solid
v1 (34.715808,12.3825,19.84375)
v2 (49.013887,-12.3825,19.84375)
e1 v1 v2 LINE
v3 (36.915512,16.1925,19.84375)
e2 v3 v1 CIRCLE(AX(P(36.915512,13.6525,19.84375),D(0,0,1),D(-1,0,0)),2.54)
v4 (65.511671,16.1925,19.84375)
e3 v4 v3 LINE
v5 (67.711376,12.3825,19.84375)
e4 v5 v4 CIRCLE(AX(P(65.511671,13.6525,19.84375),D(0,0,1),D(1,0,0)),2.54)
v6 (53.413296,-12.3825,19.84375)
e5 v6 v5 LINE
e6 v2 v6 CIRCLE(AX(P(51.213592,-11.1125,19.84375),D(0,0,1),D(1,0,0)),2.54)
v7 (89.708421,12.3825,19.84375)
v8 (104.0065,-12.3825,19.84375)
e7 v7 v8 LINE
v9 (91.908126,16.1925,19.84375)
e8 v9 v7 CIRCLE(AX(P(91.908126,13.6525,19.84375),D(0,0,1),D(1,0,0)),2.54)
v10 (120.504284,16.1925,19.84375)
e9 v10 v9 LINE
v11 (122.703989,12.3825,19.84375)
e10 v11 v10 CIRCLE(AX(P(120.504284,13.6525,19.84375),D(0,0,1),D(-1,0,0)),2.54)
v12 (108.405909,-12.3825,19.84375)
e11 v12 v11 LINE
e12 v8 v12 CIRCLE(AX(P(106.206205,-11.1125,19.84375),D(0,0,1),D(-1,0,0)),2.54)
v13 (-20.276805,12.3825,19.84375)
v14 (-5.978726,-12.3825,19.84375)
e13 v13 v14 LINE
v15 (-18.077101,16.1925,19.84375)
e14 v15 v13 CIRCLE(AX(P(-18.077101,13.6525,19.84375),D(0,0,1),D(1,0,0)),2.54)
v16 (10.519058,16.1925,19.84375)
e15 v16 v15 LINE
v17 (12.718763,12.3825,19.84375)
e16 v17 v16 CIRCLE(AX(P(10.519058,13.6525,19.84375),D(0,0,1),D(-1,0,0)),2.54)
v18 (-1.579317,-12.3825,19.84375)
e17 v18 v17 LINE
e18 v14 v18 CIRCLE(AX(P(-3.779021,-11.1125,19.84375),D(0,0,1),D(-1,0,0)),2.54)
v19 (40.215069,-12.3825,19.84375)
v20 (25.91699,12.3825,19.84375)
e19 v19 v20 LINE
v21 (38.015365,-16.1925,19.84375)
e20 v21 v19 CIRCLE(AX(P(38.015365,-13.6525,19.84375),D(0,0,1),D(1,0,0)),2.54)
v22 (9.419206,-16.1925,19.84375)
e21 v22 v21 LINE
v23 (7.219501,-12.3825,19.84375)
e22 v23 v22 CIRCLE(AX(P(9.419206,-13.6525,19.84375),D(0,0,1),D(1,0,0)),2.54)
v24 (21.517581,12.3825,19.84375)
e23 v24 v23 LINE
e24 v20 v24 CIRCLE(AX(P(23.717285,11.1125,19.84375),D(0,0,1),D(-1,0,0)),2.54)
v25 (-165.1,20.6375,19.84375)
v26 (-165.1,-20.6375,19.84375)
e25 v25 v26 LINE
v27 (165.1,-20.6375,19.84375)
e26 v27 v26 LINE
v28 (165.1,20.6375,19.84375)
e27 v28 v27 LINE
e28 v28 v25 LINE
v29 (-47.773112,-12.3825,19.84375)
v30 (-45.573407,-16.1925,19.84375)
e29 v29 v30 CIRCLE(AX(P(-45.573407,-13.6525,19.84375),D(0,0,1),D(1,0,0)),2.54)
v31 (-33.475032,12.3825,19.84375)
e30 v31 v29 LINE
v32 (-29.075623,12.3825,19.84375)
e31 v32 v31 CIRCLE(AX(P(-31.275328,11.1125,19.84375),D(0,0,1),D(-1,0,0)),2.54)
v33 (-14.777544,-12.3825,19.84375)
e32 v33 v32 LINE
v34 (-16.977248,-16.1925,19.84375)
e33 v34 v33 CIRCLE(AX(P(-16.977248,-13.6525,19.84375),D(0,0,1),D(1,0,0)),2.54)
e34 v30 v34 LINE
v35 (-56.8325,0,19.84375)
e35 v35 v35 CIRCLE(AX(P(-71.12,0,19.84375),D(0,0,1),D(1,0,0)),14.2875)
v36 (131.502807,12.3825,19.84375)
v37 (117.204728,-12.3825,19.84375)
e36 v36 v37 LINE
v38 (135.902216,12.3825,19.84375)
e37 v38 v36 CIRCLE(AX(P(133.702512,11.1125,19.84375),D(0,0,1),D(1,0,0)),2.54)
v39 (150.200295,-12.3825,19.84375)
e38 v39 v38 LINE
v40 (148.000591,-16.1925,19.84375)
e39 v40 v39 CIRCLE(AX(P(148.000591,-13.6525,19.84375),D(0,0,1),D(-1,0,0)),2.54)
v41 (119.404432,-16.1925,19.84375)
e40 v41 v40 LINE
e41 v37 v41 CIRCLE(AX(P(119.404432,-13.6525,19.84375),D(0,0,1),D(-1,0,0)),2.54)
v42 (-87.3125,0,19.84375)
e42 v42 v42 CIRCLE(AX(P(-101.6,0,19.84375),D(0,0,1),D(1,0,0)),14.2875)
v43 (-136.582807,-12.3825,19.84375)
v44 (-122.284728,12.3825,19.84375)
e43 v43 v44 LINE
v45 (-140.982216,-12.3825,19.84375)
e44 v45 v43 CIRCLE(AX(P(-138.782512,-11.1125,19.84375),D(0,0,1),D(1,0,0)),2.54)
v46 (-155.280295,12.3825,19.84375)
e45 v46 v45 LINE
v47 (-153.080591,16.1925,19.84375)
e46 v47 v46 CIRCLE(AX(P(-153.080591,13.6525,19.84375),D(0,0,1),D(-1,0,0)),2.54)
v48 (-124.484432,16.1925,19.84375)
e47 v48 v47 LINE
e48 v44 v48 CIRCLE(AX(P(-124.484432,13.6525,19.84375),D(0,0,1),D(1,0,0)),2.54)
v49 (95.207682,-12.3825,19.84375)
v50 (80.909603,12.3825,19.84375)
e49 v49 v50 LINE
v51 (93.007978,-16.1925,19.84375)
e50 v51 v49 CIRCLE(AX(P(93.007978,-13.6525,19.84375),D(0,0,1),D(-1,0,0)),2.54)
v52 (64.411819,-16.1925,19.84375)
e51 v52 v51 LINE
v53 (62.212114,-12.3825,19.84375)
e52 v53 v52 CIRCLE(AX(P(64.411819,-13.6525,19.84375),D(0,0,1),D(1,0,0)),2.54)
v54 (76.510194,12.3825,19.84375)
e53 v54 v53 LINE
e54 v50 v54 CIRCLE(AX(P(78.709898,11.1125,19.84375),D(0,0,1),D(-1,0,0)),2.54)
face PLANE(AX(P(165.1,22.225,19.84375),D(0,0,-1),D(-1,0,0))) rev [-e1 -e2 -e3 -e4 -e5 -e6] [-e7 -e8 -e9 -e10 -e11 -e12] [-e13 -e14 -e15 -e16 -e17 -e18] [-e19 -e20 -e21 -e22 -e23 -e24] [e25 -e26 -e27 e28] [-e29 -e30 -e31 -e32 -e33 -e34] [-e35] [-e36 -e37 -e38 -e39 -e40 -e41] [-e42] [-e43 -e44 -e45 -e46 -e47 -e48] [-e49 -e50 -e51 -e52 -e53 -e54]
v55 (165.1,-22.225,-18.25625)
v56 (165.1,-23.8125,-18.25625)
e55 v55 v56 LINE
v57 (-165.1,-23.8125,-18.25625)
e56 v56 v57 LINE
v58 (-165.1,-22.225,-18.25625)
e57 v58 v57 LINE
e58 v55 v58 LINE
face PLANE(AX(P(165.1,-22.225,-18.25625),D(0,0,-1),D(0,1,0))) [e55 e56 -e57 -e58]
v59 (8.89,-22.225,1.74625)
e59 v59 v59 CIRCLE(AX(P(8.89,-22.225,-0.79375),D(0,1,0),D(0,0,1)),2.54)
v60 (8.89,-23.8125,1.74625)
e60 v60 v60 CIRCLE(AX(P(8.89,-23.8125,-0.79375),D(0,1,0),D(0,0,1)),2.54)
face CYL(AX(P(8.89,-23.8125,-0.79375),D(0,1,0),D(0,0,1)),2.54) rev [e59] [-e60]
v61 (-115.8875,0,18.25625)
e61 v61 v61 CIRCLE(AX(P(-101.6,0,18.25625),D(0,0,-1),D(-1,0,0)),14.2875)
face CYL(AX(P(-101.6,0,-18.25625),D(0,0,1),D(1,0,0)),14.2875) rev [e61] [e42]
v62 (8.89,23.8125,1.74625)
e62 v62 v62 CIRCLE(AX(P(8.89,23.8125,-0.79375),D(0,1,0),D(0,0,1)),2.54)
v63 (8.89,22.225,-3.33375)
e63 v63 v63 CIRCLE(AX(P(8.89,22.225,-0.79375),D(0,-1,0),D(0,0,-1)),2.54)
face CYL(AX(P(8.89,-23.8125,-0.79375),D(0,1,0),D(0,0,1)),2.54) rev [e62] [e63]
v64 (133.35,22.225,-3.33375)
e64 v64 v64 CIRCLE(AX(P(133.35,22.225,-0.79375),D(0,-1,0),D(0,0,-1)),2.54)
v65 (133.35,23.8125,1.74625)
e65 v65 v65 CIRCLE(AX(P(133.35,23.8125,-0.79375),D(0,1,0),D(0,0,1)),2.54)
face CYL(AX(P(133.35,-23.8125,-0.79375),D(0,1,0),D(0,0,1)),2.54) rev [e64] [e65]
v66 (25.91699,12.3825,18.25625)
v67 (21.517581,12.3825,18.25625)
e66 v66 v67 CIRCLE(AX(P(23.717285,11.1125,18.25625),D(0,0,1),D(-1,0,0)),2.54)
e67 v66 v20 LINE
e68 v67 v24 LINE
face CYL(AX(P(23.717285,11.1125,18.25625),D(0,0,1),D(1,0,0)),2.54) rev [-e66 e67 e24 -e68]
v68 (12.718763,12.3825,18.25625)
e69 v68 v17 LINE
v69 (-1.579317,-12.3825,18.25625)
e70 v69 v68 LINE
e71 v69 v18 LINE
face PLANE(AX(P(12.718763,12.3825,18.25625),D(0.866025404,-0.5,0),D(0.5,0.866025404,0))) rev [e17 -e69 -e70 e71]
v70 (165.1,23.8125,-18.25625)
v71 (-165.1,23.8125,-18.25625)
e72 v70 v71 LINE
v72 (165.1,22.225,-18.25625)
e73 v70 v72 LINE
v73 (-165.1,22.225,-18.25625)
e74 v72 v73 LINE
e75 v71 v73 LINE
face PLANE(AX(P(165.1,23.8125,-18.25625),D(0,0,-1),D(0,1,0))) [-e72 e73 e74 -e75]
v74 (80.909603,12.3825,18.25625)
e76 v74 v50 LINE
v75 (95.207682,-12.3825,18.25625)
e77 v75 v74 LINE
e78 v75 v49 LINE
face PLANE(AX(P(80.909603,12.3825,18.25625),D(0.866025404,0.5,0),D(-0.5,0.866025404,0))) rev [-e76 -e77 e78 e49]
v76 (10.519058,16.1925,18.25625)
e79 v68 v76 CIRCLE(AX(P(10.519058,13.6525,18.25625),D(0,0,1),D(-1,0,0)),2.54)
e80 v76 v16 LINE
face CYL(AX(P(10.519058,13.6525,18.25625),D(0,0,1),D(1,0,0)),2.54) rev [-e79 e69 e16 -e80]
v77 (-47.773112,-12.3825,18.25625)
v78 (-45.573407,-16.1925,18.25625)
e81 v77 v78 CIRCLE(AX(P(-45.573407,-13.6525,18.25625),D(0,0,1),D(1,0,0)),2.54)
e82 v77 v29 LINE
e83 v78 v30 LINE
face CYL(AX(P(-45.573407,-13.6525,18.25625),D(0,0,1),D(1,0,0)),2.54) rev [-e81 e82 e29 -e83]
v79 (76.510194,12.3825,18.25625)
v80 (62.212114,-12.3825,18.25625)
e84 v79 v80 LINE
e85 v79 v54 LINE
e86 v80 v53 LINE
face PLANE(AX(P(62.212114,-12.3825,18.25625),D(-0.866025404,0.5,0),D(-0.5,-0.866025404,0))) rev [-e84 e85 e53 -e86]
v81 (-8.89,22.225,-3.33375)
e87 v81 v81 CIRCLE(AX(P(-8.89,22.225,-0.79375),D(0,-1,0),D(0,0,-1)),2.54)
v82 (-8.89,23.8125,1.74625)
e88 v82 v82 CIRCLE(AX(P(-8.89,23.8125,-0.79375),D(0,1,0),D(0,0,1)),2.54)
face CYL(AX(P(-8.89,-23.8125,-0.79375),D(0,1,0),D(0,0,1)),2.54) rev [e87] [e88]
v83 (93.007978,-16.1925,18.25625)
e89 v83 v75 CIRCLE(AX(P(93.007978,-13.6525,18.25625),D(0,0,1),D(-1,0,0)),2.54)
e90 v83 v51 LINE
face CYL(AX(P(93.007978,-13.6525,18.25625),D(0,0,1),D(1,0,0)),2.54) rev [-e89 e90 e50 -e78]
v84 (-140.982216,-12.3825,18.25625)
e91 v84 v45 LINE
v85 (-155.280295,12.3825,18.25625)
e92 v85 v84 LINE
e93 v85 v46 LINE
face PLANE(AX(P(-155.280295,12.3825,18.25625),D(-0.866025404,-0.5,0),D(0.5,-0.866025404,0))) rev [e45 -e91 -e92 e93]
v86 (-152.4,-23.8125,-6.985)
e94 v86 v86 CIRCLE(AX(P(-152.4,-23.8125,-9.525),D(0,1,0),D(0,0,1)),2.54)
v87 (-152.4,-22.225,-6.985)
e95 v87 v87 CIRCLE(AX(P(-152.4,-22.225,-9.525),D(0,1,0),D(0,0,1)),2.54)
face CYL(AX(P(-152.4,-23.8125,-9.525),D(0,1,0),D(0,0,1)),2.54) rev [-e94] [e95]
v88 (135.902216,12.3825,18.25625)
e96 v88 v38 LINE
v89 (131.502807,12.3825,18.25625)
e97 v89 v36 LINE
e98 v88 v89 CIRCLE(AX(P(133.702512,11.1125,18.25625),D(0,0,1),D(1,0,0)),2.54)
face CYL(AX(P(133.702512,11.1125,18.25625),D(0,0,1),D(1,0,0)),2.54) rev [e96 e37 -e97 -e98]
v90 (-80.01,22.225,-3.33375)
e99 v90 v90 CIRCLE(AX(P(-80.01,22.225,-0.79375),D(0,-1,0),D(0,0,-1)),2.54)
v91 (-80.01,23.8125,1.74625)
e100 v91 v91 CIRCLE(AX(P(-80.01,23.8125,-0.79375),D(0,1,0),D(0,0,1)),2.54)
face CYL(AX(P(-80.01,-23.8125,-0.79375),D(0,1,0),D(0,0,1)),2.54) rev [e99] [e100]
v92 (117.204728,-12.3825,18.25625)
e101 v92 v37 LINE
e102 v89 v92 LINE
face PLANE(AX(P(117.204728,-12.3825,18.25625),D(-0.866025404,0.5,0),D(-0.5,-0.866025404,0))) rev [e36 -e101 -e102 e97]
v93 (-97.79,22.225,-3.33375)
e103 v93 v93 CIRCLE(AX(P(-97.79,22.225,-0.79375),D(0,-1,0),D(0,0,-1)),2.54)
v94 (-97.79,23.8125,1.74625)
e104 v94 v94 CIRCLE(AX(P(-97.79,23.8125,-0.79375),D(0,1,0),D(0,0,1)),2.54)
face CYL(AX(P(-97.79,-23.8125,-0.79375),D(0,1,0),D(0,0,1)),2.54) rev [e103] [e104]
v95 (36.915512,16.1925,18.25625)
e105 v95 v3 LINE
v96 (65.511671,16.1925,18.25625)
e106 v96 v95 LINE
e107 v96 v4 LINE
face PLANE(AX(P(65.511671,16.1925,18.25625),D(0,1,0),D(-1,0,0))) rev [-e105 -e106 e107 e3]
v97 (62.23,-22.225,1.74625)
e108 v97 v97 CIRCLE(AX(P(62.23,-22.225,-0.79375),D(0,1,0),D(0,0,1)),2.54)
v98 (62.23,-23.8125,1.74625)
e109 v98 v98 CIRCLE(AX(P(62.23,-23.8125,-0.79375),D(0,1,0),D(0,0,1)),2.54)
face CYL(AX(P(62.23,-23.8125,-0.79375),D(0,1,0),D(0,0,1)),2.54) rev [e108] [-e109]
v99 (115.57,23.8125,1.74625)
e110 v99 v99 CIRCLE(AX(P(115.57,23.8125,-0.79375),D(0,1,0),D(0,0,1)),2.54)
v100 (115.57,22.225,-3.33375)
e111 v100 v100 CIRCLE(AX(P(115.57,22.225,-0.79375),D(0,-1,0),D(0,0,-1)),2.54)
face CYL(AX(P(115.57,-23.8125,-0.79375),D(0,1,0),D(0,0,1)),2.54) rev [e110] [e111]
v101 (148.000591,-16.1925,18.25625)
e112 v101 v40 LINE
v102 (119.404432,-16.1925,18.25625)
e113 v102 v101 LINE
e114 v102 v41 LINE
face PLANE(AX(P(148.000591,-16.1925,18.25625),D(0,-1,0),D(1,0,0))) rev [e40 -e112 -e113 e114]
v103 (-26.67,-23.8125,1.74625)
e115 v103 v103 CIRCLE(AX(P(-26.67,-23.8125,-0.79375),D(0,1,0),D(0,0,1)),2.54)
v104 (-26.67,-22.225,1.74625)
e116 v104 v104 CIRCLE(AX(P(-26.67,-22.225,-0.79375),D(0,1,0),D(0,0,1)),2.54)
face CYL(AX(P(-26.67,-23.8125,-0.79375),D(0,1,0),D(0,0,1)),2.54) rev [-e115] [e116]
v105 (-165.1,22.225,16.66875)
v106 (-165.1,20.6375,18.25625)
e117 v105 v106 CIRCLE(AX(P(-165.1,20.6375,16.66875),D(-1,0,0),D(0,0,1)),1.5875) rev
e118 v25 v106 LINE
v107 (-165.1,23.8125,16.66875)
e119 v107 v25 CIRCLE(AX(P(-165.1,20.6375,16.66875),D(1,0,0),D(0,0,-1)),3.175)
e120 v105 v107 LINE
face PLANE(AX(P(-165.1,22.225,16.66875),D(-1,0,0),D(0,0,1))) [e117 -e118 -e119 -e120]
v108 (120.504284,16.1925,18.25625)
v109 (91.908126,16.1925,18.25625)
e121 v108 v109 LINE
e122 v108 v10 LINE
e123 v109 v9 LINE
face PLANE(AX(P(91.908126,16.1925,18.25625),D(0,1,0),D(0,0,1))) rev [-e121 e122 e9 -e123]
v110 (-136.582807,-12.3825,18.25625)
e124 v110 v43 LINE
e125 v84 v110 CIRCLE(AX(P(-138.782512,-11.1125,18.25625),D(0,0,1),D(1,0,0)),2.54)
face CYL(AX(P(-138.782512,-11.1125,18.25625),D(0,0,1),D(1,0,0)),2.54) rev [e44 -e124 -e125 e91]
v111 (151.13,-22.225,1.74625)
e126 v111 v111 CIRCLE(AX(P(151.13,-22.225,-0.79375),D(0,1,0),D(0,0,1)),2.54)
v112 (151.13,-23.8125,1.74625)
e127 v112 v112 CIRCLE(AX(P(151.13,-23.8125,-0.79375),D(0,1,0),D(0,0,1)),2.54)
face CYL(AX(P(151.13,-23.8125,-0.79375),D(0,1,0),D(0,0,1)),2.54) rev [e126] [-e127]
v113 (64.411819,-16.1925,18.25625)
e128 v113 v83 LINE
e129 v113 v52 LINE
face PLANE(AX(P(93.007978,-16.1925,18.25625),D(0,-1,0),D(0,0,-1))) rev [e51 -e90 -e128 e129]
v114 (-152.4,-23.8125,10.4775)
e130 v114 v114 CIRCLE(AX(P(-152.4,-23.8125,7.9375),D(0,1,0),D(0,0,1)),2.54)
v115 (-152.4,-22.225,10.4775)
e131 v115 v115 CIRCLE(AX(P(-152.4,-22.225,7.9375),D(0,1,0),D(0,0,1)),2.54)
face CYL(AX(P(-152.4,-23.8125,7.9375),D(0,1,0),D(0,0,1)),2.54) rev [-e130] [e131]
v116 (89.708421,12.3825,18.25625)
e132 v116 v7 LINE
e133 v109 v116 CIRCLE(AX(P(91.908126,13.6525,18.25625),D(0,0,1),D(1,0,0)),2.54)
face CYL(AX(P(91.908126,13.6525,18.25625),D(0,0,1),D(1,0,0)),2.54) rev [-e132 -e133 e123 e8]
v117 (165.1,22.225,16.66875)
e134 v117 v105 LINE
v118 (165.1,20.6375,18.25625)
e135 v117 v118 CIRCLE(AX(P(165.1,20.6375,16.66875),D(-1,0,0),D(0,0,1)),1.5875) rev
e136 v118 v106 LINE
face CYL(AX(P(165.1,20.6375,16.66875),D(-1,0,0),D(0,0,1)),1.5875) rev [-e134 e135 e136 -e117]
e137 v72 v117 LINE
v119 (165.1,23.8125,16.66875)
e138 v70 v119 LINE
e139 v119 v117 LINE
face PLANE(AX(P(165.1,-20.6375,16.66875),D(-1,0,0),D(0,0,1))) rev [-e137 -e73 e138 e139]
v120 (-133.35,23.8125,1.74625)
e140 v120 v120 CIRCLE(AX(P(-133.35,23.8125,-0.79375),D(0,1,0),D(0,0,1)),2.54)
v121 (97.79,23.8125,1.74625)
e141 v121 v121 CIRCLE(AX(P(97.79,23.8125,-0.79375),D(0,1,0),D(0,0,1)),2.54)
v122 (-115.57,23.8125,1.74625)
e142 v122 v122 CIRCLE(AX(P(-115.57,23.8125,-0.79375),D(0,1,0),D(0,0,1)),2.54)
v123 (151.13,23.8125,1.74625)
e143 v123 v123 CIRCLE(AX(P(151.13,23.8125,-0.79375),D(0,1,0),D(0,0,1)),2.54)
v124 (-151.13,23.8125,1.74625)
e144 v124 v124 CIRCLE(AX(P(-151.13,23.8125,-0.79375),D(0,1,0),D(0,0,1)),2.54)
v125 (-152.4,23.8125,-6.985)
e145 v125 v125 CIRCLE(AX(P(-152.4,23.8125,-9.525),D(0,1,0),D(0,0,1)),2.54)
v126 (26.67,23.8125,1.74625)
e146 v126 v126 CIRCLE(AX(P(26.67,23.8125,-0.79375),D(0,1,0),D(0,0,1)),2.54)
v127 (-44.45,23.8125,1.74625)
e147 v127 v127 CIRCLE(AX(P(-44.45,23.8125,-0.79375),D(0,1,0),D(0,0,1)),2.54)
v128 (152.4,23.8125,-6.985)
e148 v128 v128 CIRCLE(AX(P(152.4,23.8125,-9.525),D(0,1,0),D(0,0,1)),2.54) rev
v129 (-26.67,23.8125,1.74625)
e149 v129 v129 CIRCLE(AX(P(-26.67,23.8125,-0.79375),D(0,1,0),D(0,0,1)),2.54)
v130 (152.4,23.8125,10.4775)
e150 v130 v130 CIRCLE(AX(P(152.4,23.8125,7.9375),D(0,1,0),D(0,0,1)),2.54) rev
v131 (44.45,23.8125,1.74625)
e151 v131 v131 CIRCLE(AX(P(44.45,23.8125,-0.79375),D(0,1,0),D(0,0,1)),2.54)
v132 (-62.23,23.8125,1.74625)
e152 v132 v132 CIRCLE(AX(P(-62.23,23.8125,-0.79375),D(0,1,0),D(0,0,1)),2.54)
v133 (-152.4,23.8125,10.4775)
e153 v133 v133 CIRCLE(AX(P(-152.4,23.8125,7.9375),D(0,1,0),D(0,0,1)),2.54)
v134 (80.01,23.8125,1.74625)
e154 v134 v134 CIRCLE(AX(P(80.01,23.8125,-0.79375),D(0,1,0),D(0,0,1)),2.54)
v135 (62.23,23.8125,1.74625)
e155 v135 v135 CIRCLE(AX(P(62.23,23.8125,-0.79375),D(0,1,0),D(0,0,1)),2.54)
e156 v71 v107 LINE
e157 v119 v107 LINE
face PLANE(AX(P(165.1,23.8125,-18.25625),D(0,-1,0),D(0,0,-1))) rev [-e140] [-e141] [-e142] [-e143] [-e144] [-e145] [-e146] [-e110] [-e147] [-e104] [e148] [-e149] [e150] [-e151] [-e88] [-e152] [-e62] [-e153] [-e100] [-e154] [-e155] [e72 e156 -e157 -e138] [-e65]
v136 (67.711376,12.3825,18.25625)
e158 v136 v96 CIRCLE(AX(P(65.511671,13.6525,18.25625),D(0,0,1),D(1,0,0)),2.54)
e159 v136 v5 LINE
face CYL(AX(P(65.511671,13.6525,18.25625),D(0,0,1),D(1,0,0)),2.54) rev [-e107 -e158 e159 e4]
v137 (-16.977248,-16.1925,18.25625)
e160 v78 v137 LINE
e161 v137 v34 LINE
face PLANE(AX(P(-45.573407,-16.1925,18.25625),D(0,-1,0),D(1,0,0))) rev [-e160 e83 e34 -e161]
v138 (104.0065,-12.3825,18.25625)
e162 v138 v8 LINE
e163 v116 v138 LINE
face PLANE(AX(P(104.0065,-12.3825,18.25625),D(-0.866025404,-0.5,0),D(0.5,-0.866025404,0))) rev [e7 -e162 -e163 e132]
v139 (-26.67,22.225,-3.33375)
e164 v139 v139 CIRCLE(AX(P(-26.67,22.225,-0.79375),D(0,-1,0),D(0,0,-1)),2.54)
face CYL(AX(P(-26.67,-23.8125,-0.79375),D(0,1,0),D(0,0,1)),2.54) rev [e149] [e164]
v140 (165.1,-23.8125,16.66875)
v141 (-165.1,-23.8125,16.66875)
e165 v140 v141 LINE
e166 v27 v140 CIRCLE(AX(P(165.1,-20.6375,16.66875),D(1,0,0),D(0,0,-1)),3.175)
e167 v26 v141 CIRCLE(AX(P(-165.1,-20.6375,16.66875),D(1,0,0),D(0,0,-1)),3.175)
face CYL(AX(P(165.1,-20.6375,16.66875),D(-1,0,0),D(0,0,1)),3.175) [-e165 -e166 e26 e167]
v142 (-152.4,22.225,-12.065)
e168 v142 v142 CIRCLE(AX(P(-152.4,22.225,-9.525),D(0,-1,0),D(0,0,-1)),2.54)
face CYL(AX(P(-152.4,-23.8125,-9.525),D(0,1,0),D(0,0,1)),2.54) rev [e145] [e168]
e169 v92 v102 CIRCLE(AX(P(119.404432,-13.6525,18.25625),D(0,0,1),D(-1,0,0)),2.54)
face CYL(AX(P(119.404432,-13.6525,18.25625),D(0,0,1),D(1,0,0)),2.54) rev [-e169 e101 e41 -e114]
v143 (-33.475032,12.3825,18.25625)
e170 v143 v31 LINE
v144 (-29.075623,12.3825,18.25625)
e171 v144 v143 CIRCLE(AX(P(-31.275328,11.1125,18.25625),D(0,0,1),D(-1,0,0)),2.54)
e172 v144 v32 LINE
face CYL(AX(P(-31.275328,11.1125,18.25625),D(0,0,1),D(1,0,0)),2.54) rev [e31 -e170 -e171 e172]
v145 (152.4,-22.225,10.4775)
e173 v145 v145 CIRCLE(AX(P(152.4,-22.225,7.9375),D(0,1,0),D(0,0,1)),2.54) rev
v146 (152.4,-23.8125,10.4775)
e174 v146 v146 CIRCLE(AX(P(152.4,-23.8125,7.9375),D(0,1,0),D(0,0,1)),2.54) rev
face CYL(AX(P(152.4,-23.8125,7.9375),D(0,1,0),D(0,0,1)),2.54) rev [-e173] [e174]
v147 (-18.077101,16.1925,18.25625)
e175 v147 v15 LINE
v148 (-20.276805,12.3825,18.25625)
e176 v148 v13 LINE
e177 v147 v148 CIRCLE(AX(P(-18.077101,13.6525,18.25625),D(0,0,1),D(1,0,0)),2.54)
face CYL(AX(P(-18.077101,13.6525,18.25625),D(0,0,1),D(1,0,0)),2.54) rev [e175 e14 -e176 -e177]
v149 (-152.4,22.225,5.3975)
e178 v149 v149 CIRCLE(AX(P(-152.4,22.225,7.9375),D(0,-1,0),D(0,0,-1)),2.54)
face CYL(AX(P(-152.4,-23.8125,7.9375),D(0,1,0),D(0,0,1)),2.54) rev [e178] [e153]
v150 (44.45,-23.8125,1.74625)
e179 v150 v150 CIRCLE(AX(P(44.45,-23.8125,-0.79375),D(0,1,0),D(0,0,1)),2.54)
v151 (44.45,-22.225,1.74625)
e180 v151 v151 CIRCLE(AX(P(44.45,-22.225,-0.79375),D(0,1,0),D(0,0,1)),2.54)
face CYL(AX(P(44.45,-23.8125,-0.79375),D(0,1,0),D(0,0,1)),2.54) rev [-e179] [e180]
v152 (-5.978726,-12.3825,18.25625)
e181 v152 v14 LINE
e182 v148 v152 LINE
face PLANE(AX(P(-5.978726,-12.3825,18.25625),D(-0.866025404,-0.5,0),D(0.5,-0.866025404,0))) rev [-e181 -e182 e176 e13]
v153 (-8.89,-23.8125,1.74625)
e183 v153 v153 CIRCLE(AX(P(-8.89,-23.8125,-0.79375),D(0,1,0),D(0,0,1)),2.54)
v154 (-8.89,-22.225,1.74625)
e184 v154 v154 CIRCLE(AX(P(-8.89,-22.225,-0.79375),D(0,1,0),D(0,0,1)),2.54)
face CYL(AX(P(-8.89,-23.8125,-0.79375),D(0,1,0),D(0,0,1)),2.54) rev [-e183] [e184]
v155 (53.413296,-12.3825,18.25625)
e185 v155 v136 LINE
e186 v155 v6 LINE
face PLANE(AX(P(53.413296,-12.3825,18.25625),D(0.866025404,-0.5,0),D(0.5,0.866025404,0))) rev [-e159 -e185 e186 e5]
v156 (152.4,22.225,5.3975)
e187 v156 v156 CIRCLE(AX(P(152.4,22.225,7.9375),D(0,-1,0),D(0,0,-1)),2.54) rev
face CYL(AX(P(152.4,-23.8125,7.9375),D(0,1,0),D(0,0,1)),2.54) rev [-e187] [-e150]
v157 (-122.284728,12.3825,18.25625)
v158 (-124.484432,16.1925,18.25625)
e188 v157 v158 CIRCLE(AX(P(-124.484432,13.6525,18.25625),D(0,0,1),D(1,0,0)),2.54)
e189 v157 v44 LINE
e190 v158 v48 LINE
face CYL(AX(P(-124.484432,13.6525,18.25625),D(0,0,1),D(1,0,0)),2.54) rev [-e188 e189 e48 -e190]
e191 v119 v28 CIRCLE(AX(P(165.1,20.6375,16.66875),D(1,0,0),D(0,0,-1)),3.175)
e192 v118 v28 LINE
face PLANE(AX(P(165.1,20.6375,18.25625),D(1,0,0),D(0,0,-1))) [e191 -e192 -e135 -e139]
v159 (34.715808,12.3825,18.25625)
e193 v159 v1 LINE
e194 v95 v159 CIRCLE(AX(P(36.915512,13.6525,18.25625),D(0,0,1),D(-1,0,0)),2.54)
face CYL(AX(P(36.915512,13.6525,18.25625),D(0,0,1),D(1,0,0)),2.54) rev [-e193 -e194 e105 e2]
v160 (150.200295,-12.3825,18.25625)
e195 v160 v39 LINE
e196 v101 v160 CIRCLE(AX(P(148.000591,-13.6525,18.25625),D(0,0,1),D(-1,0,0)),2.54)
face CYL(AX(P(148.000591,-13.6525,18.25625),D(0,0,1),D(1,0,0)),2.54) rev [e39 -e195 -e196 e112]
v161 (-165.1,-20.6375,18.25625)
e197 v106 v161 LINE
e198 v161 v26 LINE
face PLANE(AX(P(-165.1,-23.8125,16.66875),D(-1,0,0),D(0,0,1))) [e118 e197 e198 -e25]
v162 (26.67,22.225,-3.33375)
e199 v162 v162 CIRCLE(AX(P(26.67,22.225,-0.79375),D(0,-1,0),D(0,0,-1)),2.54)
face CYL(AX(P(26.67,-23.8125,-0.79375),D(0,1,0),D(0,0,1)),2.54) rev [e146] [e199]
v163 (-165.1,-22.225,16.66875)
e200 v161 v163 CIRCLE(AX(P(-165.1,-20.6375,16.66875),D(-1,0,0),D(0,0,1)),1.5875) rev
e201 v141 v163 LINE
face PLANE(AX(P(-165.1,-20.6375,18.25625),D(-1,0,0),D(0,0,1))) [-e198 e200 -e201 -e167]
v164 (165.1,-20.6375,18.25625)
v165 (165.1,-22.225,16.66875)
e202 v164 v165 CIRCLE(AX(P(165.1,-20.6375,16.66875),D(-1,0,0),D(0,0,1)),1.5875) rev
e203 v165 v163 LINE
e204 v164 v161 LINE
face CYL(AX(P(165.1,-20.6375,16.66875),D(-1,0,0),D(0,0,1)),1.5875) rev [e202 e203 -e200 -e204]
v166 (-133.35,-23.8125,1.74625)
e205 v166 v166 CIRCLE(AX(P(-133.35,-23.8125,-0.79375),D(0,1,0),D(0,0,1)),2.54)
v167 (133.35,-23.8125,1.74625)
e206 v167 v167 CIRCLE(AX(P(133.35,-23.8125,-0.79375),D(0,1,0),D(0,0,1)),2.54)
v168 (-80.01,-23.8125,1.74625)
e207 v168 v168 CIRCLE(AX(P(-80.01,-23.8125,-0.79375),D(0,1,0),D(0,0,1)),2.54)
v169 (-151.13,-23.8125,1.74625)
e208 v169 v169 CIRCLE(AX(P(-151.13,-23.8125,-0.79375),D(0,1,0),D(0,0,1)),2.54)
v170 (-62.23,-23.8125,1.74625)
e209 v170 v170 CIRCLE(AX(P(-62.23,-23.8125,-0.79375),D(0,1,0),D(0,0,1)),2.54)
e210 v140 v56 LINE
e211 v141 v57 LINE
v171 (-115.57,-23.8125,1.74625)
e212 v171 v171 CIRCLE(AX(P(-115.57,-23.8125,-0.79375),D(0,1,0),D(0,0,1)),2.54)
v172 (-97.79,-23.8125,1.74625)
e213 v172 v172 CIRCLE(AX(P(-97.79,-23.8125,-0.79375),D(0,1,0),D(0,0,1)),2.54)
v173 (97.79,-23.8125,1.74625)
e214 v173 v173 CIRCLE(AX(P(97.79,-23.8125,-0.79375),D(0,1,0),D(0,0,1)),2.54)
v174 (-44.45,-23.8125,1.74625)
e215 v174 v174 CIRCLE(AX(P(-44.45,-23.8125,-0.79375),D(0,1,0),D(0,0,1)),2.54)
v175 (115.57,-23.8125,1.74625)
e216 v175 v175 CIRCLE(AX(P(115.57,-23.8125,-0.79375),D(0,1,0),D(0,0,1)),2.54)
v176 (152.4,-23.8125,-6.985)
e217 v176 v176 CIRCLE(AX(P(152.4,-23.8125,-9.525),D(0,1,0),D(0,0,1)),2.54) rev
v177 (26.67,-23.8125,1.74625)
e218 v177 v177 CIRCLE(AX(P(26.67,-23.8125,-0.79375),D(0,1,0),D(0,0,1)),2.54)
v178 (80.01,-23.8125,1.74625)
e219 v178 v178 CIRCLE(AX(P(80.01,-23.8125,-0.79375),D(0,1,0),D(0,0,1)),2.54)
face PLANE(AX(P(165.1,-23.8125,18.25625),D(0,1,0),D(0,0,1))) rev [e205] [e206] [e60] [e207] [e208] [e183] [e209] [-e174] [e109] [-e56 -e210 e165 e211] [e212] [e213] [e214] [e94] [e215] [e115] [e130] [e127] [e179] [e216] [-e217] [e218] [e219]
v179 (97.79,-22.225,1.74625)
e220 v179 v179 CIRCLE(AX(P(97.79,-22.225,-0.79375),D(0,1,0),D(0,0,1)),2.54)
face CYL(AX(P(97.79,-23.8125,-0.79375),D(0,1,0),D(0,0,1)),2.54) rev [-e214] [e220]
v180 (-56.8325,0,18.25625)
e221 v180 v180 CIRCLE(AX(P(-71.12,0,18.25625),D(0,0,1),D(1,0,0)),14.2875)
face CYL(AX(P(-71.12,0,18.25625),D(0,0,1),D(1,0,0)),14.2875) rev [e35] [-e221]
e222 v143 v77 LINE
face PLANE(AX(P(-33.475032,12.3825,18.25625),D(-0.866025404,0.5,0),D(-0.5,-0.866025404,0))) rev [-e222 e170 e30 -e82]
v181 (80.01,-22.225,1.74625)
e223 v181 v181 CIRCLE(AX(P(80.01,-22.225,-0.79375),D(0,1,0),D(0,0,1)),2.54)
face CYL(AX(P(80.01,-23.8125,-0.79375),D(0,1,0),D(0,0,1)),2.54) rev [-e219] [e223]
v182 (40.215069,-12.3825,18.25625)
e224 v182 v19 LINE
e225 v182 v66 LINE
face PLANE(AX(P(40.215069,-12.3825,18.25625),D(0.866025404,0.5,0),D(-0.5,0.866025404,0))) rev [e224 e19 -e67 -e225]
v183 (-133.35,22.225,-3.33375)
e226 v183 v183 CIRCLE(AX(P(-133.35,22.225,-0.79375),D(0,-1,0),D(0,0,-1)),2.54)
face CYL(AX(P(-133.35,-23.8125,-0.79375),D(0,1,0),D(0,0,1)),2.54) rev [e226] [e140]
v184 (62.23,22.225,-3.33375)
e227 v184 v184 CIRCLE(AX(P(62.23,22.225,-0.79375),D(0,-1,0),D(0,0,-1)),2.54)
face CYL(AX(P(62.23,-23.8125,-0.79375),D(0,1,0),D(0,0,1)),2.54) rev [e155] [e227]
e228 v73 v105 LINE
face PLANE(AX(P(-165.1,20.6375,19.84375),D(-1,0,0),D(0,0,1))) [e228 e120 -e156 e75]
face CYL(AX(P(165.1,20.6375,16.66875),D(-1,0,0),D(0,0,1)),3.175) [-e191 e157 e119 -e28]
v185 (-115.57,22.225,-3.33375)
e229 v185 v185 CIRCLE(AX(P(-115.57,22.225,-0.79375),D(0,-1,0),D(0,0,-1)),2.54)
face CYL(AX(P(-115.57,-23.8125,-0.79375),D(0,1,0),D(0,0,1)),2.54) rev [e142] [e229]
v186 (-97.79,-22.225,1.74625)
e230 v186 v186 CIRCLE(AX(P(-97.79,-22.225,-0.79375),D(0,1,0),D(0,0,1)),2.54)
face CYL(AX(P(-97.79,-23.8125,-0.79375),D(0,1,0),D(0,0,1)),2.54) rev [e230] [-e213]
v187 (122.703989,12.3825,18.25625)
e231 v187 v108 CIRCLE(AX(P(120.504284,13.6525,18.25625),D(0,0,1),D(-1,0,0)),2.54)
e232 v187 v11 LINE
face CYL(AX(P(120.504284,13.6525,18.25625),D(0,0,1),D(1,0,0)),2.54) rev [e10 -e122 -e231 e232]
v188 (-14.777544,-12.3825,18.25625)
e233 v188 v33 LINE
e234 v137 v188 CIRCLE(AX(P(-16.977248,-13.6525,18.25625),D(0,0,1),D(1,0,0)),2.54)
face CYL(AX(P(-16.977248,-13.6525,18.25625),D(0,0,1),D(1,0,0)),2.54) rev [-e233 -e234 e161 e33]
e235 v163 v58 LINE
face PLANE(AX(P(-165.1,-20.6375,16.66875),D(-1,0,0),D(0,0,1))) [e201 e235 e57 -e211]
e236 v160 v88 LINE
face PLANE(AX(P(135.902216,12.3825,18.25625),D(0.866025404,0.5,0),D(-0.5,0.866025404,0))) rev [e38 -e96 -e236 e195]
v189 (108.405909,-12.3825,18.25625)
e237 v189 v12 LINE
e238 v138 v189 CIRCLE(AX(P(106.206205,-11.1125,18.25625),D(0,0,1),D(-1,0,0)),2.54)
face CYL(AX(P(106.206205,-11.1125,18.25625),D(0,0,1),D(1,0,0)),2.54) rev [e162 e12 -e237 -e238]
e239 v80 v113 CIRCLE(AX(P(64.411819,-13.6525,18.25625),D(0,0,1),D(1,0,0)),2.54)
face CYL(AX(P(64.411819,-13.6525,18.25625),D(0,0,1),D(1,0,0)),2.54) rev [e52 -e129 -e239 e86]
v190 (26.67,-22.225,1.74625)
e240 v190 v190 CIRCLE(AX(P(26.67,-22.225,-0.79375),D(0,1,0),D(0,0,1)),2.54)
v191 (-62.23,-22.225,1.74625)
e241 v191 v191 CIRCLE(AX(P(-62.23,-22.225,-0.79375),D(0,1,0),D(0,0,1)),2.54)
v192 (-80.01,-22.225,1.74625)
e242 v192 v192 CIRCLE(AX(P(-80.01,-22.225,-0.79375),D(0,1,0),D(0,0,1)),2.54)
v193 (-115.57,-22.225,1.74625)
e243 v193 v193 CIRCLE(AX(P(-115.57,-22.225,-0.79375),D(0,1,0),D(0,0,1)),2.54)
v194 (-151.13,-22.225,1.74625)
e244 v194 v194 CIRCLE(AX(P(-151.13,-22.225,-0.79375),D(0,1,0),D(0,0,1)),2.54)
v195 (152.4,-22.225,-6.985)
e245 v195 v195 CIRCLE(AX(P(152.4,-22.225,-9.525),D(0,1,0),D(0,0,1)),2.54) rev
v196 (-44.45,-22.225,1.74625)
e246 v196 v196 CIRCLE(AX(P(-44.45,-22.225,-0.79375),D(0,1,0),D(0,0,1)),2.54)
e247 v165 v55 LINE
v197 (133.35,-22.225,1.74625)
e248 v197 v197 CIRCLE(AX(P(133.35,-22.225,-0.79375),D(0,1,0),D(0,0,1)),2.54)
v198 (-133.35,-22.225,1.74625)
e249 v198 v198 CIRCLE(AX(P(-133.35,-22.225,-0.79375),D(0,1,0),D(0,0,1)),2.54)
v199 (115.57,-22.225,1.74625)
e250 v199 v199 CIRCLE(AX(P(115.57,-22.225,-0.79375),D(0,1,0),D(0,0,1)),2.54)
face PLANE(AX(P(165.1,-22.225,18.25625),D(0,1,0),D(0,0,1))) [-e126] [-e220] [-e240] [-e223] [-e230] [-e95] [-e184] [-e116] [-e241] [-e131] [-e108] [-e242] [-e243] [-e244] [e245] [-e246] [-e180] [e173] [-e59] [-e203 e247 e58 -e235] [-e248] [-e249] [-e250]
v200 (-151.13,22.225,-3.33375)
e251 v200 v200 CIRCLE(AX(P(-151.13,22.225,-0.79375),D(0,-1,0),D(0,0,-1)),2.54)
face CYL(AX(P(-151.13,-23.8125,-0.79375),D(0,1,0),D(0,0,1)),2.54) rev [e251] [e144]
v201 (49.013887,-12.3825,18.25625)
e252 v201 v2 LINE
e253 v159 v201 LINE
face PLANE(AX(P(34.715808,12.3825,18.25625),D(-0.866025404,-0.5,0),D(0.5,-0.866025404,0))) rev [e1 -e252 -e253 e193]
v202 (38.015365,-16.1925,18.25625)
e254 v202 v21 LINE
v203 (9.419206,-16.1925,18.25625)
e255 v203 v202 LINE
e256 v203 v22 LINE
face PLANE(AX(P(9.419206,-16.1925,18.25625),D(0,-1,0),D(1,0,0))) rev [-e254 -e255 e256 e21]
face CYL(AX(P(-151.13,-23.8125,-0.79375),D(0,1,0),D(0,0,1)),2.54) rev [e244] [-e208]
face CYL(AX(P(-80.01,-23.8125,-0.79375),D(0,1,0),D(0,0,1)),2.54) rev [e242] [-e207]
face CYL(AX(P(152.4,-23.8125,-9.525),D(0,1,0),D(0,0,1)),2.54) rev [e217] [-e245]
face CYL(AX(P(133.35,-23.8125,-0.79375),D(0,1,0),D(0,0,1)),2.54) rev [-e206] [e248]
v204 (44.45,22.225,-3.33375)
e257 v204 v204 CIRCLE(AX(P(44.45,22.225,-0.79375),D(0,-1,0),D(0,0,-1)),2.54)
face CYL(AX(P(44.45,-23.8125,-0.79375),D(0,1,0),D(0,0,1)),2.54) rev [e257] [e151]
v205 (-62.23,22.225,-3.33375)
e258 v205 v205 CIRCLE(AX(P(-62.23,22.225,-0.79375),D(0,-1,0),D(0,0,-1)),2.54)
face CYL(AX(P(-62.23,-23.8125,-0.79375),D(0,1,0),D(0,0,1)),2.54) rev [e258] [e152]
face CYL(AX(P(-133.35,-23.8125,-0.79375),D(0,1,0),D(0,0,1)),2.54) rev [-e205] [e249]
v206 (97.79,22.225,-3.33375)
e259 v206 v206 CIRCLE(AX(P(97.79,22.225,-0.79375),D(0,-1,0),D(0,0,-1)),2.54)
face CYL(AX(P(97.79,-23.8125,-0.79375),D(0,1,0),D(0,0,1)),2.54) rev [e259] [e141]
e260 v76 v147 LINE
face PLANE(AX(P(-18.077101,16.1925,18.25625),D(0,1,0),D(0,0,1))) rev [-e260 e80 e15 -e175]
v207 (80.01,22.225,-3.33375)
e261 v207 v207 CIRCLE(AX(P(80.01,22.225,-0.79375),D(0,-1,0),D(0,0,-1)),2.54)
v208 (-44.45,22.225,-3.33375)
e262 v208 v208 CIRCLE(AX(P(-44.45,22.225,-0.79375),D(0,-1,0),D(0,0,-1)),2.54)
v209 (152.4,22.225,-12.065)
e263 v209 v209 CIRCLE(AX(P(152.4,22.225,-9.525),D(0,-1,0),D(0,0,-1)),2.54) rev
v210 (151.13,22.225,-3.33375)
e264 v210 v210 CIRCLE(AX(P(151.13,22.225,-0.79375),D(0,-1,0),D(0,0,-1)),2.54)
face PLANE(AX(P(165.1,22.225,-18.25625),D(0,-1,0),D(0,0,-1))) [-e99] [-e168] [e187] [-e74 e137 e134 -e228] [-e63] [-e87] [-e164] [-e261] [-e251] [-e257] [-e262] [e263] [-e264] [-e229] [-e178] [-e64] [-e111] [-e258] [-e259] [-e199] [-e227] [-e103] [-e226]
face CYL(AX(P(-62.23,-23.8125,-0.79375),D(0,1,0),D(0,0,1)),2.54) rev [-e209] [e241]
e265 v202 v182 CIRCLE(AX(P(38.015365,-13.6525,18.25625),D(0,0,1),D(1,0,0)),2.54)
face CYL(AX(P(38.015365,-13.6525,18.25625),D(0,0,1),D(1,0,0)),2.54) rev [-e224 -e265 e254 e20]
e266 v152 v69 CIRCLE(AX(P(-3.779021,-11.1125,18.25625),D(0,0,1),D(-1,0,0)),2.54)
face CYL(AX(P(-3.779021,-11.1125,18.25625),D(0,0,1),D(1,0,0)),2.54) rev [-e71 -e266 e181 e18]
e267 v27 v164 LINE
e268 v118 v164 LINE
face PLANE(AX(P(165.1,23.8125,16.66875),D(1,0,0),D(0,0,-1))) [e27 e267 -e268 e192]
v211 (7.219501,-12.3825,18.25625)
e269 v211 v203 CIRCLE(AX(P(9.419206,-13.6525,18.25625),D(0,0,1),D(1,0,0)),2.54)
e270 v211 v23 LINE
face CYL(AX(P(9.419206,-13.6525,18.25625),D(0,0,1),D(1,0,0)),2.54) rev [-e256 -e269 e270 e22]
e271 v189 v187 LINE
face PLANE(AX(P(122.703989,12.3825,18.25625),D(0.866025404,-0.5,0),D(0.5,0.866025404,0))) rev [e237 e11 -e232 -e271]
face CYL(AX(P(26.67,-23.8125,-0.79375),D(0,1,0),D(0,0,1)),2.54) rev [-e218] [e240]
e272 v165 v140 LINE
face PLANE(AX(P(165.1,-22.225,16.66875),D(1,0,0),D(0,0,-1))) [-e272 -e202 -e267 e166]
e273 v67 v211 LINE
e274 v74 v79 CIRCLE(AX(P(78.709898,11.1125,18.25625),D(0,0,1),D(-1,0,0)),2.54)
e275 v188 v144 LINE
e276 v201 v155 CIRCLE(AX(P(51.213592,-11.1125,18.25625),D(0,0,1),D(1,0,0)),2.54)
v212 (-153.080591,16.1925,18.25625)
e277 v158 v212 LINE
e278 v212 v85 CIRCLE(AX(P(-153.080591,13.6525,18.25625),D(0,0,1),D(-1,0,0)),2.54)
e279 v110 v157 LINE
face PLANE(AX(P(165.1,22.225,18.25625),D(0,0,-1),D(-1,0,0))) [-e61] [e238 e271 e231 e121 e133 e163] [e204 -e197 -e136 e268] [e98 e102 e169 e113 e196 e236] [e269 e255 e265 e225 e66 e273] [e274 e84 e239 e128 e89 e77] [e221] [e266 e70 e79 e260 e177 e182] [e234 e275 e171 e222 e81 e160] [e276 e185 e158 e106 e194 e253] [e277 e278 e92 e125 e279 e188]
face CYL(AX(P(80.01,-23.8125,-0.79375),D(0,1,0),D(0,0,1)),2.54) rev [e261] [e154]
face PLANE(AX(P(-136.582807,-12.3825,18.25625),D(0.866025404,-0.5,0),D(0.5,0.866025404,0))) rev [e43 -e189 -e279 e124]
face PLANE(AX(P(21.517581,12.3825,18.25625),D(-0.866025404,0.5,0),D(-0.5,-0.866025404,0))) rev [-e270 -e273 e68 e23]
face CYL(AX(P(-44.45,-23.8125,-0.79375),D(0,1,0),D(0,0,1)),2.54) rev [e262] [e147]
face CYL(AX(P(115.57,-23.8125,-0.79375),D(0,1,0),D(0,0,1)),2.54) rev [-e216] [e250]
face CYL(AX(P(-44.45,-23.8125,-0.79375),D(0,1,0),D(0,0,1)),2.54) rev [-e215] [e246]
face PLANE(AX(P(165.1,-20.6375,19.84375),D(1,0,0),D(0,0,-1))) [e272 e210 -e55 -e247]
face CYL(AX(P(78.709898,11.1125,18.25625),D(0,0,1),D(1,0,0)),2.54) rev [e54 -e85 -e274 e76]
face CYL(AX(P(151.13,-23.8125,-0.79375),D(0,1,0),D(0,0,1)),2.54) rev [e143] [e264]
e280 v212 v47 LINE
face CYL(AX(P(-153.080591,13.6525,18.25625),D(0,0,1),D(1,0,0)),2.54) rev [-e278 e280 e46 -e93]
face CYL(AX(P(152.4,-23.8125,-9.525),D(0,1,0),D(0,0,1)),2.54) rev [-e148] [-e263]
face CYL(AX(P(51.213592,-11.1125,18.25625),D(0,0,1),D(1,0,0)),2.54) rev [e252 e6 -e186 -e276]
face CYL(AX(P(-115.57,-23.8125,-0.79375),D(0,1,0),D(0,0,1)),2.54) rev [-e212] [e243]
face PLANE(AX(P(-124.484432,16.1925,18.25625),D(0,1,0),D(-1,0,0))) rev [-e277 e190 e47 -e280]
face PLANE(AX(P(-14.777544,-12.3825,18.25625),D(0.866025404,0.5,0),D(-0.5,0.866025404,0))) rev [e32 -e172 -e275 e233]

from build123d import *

# Parameters (mm, degrees)
BASE_FLANGE1_DEPTH = 165.1
SKETCH6_R          = 2.54
CUT_EXTRUDE1_DEPTH = 173.973769801
SKETCH8_R          = 14.2875
CUT_EXTRUDE2_DEPTH = 172.104223081
SKETCH9_R          = 14.2875
CUT_EXTRUDE3_DEPTH = 2.54
CUT_EXTRUDE4_DEPTH = 2.54
SKETCH11_R         = 2.54
CUT_EXTRUDE5_DEPTH = 173.973769801


# Sheet-metal steps are written as plain solids
with BuildPart() as part:
    # Sketch1 → Base-Flange1 (new, symmetric)
    with BuildSketch(Plane(origin=(0, 0, 0), x_dir=(0, 0, -1), z_dir=(1, 0, 0))):
        with BuildLine():
            Line((18.25625, 22.225), (-16.66875, 22.225))
            ThreePointArc((-16.66875, 22.225), (-17.791282015, 21.760032015), (-18.25625, 20.6375))
            Line((-18.25625, 20.6375), (-18.25625, -20.6375))
            ThreePointArc((-18.25625, -20.6375), (-17.791282015, -21.760032015), (-16.66875, -22.225))
            Line((-16.66875, -22.225), (18.25625, -22.225))
            Line((18.25625, -22.225), (18.25625, -23.8125))
            Line((18.25625, -23.8125), (-16.66875, -23.8125))
            ThreePointArc((-16.66875, -23.8125), (-18.91381403, -22.88256403), (-19.84375, -20.6375))
            Line((-19.84375, -20.6375), (-19.84375, 20.6375))
            ThreePointArc((-19.84375, 20.6375), (-18.91381403, 22.88256403), (-16.66875, 23.8125))
            Line((-16.66875, 23.8125), (18.25625, 23.8125))
            Line((18.25625, 23.8125), (18.25625, 22.225))
        make_face()
    extrude(amount=BASE_FLANGE1_DEPTH, both=True)

    # Sketch6 → Cut-Extrude1 (cut, through all)
    with BuildSketch(Plane(origin=(0, 23.8125, 0), x_dir=(1, 0, 0), z_dir=(0, 1, 0))):
        with Locations(Location((151.13, 0.79375, 0), (0, 0, 270))):
            Circle(SKETCH6_R)
        with Locations(Location((133.35, 0.79375, 0), (0, 0, 270))):
            Circle(SKETCH6_R)
        with Locations(Location((115.57, 0.79375, 0), (0, 0, 270))):
            Circle(SKETCH6_R)
        with Locations(Location((97.79, 0.79375, 0), (0, 0, 270))):
            Circle(SKETCH6_R)
        with Locations(Location((80.01, 0.79375, 0), (0, 0, 270))):
            Circle(SKETCH6_R)
        with Locations(Location((62.23, 0.79375, 0), (0, 0, 270))):
            Circle(SKETCH6_R)
        with Locations(Location((44.45, 0.79375, 0), (0, 0, 270))):
            Circle(SKETCH6_R)
        with Locations(Location((26.67, 0.79375, 0), (0, 0, 270))):
            Circle(SKETCH6_R)
        with Locations(Location((8.89, 0.79375, 0), (0, 0, 270))):
            Circle(SKETCH6_R)
        with Locations(Location((-8.89, 0.79375, 0), (0, 0, 270))):
            Circle(SKETCH6_R)
        with Locations(Location((-26.67, 0.79375, 0), (0, 0, 270))):
            Circle(SKETCH6_R)
        with Locations(Location((-44.45, 0.79375, 0), (0, 0, 270))):
            Circle(SKETCH6_R)
        with Locations(Location((-62.23, 0.79375, 0), (0, 0, 270))):
            Circle(SKETCH6_R)
        with Locations(Location((-80.01, 0.79375, 0), (0, 0, 270))):
            Circle(SKETCH6_R)
        with Locations(Location((-97.79, 0.79375, 0), (0, 0, 270))):
            Circle(SKETCH6_R)
        with Locations(Location((-115.57, 0.79375, 0), (0, 0, 270))):
            Circle(SKETCH6_R)
        with Locations(Location((-133.35, 0.79375, 0), (0, 0, 270))):
            Circle(SKETCH6_R)
        with Locations(Location((-151.13, 0.79375, 0), (0, 0, 270))):
            Circle(SKETCH6_R)
    extrude(amount=-CUT_EXTRUDE1_DEPTH, mode=Mode.SUBTRACT)

    # Sketch8 → Cut-Extrude2 (cut, through all)
    with BuildSketch(Plane.XY.offset(19.84375)):
        with Locations((-101.6, 0)):
            Circle(SKETCH8_R)
    extrude(amount=-CUT_EXTRUDE2_DEPTH, mode=Mode.SUBTRACT)

    # Sketch9 → Cut-Extrude3 (cut)
    with BuildSketch(Plane.XY.offset(19.84375)):
        with Locations((-71.12, 0)):
            Circle(SKETCH9_R)
        with BuildLine():
            Line((135.902216058, 12.3825), (150.200295474, -12.3825))
            ThreePointArc((150.200295474, -12.3825), (150.200295474, -14.9225), (148.000590949, -16.1925))
            Line((148.000590949, -16.1925), (119.404432116, -16.1925))
            ThreePointArc((119.404432116, -16.1925), (117.20472759, -14.9225), (117.20472759, -12.3825))
            Line((117.20472759, -12.3825), (131.502807007, 12.3825))
            ThreePointArc((131.502807007, 12.3825), (133.702511532, 13.6525), (135.902216058, 12.3825))
        make_face()
        with BuildLine():
            Line((91.908125546, 16.1925), (120.504284379, 16.1925))
            ThreePointArc((120.504284379, 16.1925), (122.703988904, 14.9225), (122.703988904, 12.3825))
            Line((122.703988904, 12.3825), (108.405909488, -12.3825))
            ThreePointArc((108.405909488, -12.3825), (106.206204962, -13.6525), (104.006500437, -12.3825))
            Line((104.006500437, -12.3825), (89.70842102, 12.3825))
            ThreePointArc((89.70842102, 12.3825), (89.70842102, 14.9225), (91.908125546, 16.1925))
        make_face()
        with BuildLine():
            Line((62.21211445, -12.3825), (76.510193866, 12.3825))
            ThreePointArc((76.510193866, 12.3825), (78.709898392, 13.6525), (80.909602918, 12.3825))
            Line((80.909602918, 12.3825), (95.207682334, -12.3825))
            ThreePointArc((95.207682334, -12.3825), (95.207682334, -14.9225), (93.007977808, -16.1925))
            Line((93.007977808, -16.1925), (64.411818976, -16.1925))
            ThreePointArc((64.411818976, -16.1925), (62.21211445, -14.9225), (62.21211445, -12.3825))
        make_face()
        with BuildLine():
            Line((34.71580788, 12.3825), (49.013887296, -12.3825))
            ThreePointArc((49.013887296, -12.3825), (51.213591822, -13.6525), (53.413296347, -12.3825))
            Line((53.413296347, -12.3825), (67.711375764, 12.3825))
            ThreePointArc((67.711375764, 12.3825), (67.711375764, 14.9225), (65.511671238, 16.1925))
            Line((65.511671238, 16.1925), (36.915512405, 16.1925))
            ThreePointArc((36.915512405, 16.1925), (34.71580788, 14.9225), (34.71580788, 12.3825))
        make_face()
        with BuildLine():
            Line((21.517580726, 12.3825), (7.21950131, -12.3825))
            ThreePointArc((7.21950131, -12.3825), (7.21950131, -14.9225), (9.419205835, -16.1925))
            Line((9.419205835, -16.1925), (38.015364668, -16.1925))
            ThreePointArc((38.015364668, -16.1925), (40.215069194, -14.9225), (40.215069194, -12.3825))
            Line((40.215069194, -12.3825), (25.916989777, 12.3825))
            ThreePointArc((25.916989777, 12.3825), (23.717285252, 13.6525), (21.517580726, 12.3825))
        make_face()
        with BuildLine():
            Line((-18.077100735, 16.1925), (10.519058098, 16.1925))
            ThreePointArc((10.519058098, 16.1925), (12.718762624, 14.9225), (12.718762624, 12.3825))
            Line((12.718762624, 12.3825), (-1.579316793, -12.3825))
            ThreePointArc((-1.579316793, -12.3825), (-3.779021318, -13.6525), (-5.978725844, -12.3825))
            Line((-5.978725844, -12.3825), (-20.276805261, 12.3825))
            ThreePointArc((-20.276805261, 12.3825), (-20.276805261, 14.9225), (-18.077100735, 16.1925))
        make_face()
        with BuildLine():
            Line((-33.475032414, 12.3825), (-47.773111831, -12.3825))
            ThreePointArc((-47.773111831, -12.3825), (-47.773111831, -14.9225), (-45.573407305, -16.1925))
            Line((-45.573407305, -16.1925), (-16.977248472, -16.1925))
            ThreePointArc((-16.977248472, -16.1925), (-14.777543947, -14.9225), (-14.777543947, -12.3825))
            Line((-14.777543947, -12.3825), (-29.075623363, 12.3825))
            ThreePointArc((-29.075623363, 12.3825), (-31.275327889, 13.6525), (-33.475032414, 12.3825))
        make_face()
    extrude(amount=-CUT_EXTRUDE3_DEPTH, mode=Mode.SUBTRACT)

    # Sketch10 → Cut-Extrude4 (cut)
    with BuildSketch(Plane.XY.offset(19.84375)):
        with BuildLine():
            Line((-155.280295474, 12.3825), (-140.982216058, -12.3825))
            ThreePointArc((-140.982216058, -12.3825), (-138.782511532, -13.6525), (-136.582807007, -12.3825))
            Line((-136.582807007, -12.3825), (-122.28472759, 12.3825))
            ThreePointArc((-122.28472759, 12.3825), (-122.28472759, 14.9225), (-124.484432116, 16.1925))
            Line((-124.484432116, 16.1925), (-153.080590949, 16.1925))
            ThreePointArc((-153.080590949, 16.1925), (-155.280295474, 14.9225), (-155.280295474, 12.3825))
        make_face()
    extrude(amount=-CUT_EXTRUDE4_DEPTH, mode=Mode.SUBTRACT)

    # Sketch11 → Cut-Extrude5 (cut, through all)
    with BuildSketch(Plane(origin=(0, 23.8125, 0), x_dir=(1, 0, 0), z_dir=(0, 1, 0))):
        with Locations(Location((152.4, 9.525, 0), (0, 0, 270))):
            Circle(SKETCH11_R)
        with Locations(Location((152.4, -7.9375, 0), (0, 0, 270))):
            Circle(SKETCH11_R)
        with Locations(Location((-152.4, -7.9375, 0), (0, 0, 270))):
            Circle(SKETCH11_R)
        with Locations(Location((-152.4, 9.525, 0), (0, 0, 270))):
            Circle(SKETCH11_R)
    extrude(amount=-CUT_EXTRUDE5_DEPTH, mode=Mode.SUBTRACT)


solid = part.part
